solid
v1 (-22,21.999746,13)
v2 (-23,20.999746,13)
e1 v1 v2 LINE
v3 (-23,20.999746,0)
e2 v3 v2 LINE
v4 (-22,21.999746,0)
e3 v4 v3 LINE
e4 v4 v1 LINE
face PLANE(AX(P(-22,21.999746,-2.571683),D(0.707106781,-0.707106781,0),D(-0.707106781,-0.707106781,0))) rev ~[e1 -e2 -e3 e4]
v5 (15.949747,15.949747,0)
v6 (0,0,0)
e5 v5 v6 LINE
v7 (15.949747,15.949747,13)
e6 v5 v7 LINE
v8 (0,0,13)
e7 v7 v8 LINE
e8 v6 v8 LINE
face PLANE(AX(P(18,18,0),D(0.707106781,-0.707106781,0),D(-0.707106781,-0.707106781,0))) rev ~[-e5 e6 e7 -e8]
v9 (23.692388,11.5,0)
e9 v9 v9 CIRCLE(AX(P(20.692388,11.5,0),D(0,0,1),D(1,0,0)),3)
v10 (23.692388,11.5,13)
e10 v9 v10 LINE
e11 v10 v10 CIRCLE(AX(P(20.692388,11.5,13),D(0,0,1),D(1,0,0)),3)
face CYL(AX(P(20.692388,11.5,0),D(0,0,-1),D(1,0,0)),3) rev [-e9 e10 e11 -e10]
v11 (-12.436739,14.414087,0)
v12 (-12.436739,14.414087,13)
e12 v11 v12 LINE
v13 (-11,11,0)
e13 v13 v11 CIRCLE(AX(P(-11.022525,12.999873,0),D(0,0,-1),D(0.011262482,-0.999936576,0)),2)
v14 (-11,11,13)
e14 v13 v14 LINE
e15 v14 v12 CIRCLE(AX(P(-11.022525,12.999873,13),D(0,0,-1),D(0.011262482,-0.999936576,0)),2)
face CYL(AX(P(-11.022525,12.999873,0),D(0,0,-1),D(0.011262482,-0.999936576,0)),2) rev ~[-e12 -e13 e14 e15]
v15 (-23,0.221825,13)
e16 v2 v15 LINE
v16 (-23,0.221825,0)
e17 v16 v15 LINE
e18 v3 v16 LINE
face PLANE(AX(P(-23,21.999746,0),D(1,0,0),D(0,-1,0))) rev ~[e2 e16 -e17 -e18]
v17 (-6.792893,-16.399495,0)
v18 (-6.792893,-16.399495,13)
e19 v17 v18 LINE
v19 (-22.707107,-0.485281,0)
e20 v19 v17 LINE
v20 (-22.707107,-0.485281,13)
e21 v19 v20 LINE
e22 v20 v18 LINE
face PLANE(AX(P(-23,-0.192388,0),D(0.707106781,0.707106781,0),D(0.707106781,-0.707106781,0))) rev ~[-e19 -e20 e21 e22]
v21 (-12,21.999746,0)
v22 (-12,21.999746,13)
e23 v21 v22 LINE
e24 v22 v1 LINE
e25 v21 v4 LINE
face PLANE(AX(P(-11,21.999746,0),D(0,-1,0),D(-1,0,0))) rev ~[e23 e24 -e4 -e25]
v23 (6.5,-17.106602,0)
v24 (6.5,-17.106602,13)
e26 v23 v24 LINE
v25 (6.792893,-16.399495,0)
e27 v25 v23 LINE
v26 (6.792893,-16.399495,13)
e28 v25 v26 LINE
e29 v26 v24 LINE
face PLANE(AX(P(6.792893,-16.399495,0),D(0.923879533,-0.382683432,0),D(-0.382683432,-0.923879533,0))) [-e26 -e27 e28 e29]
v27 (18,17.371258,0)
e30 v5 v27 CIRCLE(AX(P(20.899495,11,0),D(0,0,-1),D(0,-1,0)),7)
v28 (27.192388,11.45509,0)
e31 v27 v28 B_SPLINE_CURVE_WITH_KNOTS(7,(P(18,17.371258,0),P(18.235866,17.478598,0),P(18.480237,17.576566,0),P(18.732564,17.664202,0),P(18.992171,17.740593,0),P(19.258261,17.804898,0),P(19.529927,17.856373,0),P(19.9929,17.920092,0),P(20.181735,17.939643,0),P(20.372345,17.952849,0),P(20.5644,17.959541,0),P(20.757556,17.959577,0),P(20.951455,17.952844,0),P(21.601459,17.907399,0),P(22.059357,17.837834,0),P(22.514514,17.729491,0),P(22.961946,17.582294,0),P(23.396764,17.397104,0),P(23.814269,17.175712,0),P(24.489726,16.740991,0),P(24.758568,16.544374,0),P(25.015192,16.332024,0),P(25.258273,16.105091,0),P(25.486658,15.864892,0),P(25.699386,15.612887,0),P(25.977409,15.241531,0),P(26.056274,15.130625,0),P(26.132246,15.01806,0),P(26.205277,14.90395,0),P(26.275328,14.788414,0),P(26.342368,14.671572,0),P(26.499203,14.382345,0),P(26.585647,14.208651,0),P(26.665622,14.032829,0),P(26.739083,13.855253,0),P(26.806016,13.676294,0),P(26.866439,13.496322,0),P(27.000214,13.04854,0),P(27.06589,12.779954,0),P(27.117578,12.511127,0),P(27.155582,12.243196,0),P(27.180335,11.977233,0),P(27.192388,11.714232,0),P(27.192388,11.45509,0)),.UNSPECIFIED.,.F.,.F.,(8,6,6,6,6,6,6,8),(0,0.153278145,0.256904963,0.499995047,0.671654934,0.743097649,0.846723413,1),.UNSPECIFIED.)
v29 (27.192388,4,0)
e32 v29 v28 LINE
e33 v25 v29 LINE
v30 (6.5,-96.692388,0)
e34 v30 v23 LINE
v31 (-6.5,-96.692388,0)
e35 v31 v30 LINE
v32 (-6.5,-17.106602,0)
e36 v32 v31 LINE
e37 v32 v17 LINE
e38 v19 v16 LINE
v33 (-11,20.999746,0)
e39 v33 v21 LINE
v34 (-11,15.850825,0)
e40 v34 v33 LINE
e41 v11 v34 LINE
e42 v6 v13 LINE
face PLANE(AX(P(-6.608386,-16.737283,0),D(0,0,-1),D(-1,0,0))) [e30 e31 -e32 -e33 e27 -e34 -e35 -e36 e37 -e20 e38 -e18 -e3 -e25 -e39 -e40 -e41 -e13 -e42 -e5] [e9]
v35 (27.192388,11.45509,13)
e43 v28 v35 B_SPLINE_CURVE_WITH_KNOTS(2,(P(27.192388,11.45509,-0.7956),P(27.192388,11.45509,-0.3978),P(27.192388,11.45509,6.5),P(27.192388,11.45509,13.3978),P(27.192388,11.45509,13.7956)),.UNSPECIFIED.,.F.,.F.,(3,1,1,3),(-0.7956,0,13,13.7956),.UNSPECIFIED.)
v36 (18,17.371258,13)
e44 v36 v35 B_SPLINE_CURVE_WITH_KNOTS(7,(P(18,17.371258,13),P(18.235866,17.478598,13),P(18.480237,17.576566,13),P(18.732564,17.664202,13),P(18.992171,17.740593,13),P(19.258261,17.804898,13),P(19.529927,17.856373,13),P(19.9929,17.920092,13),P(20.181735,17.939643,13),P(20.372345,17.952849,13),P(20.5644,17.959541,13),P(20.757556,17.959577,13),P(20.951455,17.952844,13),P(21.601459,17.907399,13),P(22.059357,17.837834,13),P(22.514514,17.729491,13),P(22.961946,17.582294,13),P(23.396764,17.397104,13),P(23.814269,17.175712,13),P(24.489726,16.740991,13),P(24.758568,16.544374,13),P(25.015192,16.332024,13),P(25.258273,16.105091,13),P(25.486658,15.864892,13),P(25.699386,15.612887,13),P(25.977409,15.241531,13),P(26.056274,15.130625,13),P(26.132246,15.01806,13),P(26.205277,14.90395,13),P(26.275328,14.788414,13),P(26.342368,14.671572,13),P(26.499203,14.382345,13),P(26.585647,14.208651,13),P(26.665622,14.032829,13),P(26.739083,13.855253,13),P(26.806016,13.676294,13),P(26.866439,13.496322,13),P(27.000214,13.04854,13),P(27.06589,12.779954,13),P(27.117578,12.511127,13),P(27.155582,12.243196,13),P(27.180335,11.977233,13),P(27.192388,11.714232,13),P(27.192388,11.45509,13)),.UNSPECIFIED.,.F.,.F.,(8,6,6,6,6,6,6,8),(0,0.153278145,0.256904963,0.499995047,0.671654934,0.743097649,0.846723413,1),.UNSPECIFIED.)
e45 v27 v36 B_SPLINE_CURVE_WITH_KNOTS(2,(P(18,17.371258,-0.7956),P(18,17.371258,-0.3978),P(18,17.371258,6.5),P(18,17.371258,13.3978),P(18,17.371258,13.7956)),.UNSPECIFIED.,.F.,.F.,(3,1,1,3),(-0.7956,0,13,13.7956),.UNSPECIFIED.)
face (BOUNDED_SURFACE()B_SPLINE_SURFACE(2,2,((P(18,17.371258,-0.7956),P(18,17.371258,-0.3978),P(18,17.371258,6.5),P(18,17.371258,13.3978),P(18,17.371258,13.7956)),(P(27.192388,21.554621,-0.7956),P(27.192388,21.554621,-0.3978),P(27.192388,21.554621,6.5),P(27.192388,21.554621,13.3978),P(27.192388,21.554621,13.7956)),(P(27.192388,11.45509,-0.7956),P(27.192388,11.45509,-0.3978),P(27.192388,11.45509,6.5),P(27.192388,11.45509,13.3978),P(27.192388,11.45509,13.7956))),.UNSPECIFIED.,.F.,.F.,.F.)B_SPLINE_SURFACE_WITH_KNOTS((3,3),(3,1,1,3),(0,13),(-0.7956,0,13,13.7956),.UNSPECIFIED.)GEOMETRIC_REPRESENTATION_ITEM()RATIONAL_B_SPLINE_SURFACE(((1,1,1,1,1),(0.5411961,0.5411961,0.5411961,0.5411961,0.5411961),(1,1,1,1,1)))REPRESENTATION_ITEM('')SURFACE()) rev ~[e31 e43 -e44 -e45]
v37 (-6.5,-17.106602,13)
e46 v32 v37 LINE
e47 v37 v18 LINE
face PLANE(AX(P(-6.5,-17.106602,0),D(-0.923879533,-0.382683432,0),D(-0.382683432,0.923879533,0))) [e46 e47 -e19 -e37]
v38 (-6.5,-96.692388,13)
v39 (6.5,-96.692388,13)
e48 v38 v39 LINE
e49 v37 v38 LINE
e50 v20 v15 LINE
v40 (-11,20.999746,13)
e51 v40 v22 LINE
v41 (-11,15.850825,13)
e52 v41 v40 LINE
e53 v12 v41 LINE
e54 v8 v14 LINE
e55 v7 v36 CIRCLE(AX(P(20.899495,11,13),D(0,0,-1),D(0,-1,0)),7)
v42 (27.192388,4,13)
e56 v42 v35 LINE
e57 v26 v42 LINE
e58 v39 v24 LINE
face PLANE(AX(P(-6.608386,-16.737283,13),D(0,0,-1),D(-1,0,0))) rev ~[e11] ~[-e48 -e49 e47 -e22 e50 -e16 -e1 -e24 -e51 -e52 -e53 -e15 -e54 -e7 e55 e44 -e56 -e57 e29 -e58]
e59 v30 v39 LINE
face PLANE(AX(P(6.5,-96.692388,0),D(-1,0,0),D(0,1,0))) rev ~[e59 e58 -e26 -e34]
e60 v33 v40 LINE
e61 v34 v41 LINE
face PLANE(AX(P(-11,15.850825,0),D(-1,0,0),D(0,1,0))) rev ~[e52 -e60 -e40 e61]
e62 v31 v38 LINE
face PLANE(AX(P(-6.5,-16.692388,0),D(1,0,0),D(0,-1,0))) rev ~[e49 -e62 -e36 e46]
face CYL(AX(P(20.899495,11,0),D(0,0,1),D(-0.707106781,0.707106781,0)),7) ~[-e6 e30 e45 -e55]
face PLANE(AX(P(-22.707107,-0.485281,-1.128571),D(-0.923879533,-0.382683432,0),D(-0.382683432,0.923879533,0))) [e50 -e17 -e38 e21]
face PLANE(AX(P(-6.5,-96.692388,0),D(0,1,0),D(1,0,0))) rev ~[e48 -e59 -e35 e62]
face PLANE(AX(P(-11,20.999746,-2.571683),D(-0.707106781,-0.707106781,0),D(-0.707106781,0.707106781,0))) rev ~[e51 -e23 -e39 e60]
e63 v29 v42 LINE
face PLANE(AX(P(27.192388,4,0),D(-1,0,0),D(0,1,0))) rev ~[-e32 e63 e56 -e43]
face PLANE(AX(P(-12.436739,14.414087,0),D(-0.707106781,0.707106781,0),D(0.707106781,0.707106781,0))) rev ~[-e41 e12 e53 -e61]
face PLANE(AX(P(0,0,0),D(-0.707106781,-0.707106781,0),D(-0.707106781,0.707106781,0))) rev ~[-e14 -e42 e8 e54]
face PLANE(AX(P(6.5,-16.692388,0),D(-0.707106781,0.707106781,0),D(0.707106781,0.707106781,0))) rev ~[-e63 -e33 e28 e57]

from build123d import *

# Parameters (mm, degrees)
F0_R        = 3
F1_DEPTH    = 13
F2_R        = 7
F3_R        = 6.5
F4_T1_DEPTH = 13
F4_T3_DEPTH = 18.1433659759
F4_T5_DEPTH = 15.2571417204


# Not quite as in the source:
# - a fillet or chamfer that OpenCascade refuses, or shapes differently, is made with other operations: its cross-section is extruded or revolved along the edge and cut away or added


with BuildPart() as f1:
    # F0 (on Top) → F1 (new body)
    with BuildSketch(Plane.XY):
        with BuildLine():
            Line((18, 18), (0, 0))
            Line((0, 0), (-11, 11))
            ThreePointArc((-11, 11), (-12.8659446975, 12.2241130817), (-12.4367385267, 14.4140867148))
            Line((-12.4367385267, 14.4140867148), (-11, 15.8508252416))
            Line((-11, 15.8508252416), (-11, 21.9997463049))
            Line((-11, 21.9997463049), (-23, 21.9997463049))
            Line((-23, 21.9997463049), (-23, -0.1923881554))
            Line((-23, -0.1923881554), (-6.5, -16.6923881554))
            Line((-6.5, -16.6923881554), (-6.5, -96.6923881554))
            Line((-6.5, -96.6923881554), (6.5, -96.6923881554))
            Line((6.5, -96.6923881554), (6.5, -16.6923881554))
            Line((6.5, -16.6923881554), (27.1923881554, 4))
            Line((27.1923881554, 4), (27.1923881554, 18))
            Line((27.1923881554, 18), (18, 18))
        make_face()
        with Locations((20.6923881554, 11.5)):
            Circle(F0_R, mode=Mode.SUBTRACT)
    extrude(amount=F1_DEPTH)

    # F2
    f2_edges = [f1.edges().sort_by_distance(p)[0] for p in [
        (18, 18, 6.5),
    ]]
    fillet(f2_edges, radius=F2_R)

    # F3
    f3_edges = [f1.edges().sort_by_distance(p)[0] for p in [
        (27.192388, 18, 6.5),
    ]]
    fillet(f3_edges, radius=F3_R)

    # F4: chamfer of 1 on 5 edges, made by hand

    # F4_s2 → F4_t1 (join)
    with BuildSketch(Plane.XY):
        Polygon((-6.5, -17.1066017178), (-6.7928932188, -16.3994949366), (-6.5, -16.6923881554), align=None)
        Polygon((6.7928932188, -16.3994949366), (6.5, -17.1066017178), (6.5, -16.6923881554), align=None)
    extrude(amount=F4_T1_DEPTH)

    # F4_s4 → F4_t3 (cut)
    with BuildSketch(Plane.XY.offset(-2.571682988)):
        Polygon((-11, 20.9997463049), (-12, 21.9997463049), (-11, 21.9997463049), align=None)
        Polygon((-22, 21.9997463049), (-23, 20.9997463049), (-23, 21.9997463049), align=None)
    extrude(amount=F4_T3_DEPTH, mode=Mode.SUBTRACT)

    # F4_s6 → F4_t5 (cut)
    with BuildSketch(Plane.XY.offset(-1.1285708602)):
        Polygon((-22.7071067812, -0.4852813742), (-23, 0.2218254069), (-23, -0.1923881554), align=None)
    extrude(amount=F4_T5_DEPTH, mode=Mode.SUBTRACT)


solid = f1.part
